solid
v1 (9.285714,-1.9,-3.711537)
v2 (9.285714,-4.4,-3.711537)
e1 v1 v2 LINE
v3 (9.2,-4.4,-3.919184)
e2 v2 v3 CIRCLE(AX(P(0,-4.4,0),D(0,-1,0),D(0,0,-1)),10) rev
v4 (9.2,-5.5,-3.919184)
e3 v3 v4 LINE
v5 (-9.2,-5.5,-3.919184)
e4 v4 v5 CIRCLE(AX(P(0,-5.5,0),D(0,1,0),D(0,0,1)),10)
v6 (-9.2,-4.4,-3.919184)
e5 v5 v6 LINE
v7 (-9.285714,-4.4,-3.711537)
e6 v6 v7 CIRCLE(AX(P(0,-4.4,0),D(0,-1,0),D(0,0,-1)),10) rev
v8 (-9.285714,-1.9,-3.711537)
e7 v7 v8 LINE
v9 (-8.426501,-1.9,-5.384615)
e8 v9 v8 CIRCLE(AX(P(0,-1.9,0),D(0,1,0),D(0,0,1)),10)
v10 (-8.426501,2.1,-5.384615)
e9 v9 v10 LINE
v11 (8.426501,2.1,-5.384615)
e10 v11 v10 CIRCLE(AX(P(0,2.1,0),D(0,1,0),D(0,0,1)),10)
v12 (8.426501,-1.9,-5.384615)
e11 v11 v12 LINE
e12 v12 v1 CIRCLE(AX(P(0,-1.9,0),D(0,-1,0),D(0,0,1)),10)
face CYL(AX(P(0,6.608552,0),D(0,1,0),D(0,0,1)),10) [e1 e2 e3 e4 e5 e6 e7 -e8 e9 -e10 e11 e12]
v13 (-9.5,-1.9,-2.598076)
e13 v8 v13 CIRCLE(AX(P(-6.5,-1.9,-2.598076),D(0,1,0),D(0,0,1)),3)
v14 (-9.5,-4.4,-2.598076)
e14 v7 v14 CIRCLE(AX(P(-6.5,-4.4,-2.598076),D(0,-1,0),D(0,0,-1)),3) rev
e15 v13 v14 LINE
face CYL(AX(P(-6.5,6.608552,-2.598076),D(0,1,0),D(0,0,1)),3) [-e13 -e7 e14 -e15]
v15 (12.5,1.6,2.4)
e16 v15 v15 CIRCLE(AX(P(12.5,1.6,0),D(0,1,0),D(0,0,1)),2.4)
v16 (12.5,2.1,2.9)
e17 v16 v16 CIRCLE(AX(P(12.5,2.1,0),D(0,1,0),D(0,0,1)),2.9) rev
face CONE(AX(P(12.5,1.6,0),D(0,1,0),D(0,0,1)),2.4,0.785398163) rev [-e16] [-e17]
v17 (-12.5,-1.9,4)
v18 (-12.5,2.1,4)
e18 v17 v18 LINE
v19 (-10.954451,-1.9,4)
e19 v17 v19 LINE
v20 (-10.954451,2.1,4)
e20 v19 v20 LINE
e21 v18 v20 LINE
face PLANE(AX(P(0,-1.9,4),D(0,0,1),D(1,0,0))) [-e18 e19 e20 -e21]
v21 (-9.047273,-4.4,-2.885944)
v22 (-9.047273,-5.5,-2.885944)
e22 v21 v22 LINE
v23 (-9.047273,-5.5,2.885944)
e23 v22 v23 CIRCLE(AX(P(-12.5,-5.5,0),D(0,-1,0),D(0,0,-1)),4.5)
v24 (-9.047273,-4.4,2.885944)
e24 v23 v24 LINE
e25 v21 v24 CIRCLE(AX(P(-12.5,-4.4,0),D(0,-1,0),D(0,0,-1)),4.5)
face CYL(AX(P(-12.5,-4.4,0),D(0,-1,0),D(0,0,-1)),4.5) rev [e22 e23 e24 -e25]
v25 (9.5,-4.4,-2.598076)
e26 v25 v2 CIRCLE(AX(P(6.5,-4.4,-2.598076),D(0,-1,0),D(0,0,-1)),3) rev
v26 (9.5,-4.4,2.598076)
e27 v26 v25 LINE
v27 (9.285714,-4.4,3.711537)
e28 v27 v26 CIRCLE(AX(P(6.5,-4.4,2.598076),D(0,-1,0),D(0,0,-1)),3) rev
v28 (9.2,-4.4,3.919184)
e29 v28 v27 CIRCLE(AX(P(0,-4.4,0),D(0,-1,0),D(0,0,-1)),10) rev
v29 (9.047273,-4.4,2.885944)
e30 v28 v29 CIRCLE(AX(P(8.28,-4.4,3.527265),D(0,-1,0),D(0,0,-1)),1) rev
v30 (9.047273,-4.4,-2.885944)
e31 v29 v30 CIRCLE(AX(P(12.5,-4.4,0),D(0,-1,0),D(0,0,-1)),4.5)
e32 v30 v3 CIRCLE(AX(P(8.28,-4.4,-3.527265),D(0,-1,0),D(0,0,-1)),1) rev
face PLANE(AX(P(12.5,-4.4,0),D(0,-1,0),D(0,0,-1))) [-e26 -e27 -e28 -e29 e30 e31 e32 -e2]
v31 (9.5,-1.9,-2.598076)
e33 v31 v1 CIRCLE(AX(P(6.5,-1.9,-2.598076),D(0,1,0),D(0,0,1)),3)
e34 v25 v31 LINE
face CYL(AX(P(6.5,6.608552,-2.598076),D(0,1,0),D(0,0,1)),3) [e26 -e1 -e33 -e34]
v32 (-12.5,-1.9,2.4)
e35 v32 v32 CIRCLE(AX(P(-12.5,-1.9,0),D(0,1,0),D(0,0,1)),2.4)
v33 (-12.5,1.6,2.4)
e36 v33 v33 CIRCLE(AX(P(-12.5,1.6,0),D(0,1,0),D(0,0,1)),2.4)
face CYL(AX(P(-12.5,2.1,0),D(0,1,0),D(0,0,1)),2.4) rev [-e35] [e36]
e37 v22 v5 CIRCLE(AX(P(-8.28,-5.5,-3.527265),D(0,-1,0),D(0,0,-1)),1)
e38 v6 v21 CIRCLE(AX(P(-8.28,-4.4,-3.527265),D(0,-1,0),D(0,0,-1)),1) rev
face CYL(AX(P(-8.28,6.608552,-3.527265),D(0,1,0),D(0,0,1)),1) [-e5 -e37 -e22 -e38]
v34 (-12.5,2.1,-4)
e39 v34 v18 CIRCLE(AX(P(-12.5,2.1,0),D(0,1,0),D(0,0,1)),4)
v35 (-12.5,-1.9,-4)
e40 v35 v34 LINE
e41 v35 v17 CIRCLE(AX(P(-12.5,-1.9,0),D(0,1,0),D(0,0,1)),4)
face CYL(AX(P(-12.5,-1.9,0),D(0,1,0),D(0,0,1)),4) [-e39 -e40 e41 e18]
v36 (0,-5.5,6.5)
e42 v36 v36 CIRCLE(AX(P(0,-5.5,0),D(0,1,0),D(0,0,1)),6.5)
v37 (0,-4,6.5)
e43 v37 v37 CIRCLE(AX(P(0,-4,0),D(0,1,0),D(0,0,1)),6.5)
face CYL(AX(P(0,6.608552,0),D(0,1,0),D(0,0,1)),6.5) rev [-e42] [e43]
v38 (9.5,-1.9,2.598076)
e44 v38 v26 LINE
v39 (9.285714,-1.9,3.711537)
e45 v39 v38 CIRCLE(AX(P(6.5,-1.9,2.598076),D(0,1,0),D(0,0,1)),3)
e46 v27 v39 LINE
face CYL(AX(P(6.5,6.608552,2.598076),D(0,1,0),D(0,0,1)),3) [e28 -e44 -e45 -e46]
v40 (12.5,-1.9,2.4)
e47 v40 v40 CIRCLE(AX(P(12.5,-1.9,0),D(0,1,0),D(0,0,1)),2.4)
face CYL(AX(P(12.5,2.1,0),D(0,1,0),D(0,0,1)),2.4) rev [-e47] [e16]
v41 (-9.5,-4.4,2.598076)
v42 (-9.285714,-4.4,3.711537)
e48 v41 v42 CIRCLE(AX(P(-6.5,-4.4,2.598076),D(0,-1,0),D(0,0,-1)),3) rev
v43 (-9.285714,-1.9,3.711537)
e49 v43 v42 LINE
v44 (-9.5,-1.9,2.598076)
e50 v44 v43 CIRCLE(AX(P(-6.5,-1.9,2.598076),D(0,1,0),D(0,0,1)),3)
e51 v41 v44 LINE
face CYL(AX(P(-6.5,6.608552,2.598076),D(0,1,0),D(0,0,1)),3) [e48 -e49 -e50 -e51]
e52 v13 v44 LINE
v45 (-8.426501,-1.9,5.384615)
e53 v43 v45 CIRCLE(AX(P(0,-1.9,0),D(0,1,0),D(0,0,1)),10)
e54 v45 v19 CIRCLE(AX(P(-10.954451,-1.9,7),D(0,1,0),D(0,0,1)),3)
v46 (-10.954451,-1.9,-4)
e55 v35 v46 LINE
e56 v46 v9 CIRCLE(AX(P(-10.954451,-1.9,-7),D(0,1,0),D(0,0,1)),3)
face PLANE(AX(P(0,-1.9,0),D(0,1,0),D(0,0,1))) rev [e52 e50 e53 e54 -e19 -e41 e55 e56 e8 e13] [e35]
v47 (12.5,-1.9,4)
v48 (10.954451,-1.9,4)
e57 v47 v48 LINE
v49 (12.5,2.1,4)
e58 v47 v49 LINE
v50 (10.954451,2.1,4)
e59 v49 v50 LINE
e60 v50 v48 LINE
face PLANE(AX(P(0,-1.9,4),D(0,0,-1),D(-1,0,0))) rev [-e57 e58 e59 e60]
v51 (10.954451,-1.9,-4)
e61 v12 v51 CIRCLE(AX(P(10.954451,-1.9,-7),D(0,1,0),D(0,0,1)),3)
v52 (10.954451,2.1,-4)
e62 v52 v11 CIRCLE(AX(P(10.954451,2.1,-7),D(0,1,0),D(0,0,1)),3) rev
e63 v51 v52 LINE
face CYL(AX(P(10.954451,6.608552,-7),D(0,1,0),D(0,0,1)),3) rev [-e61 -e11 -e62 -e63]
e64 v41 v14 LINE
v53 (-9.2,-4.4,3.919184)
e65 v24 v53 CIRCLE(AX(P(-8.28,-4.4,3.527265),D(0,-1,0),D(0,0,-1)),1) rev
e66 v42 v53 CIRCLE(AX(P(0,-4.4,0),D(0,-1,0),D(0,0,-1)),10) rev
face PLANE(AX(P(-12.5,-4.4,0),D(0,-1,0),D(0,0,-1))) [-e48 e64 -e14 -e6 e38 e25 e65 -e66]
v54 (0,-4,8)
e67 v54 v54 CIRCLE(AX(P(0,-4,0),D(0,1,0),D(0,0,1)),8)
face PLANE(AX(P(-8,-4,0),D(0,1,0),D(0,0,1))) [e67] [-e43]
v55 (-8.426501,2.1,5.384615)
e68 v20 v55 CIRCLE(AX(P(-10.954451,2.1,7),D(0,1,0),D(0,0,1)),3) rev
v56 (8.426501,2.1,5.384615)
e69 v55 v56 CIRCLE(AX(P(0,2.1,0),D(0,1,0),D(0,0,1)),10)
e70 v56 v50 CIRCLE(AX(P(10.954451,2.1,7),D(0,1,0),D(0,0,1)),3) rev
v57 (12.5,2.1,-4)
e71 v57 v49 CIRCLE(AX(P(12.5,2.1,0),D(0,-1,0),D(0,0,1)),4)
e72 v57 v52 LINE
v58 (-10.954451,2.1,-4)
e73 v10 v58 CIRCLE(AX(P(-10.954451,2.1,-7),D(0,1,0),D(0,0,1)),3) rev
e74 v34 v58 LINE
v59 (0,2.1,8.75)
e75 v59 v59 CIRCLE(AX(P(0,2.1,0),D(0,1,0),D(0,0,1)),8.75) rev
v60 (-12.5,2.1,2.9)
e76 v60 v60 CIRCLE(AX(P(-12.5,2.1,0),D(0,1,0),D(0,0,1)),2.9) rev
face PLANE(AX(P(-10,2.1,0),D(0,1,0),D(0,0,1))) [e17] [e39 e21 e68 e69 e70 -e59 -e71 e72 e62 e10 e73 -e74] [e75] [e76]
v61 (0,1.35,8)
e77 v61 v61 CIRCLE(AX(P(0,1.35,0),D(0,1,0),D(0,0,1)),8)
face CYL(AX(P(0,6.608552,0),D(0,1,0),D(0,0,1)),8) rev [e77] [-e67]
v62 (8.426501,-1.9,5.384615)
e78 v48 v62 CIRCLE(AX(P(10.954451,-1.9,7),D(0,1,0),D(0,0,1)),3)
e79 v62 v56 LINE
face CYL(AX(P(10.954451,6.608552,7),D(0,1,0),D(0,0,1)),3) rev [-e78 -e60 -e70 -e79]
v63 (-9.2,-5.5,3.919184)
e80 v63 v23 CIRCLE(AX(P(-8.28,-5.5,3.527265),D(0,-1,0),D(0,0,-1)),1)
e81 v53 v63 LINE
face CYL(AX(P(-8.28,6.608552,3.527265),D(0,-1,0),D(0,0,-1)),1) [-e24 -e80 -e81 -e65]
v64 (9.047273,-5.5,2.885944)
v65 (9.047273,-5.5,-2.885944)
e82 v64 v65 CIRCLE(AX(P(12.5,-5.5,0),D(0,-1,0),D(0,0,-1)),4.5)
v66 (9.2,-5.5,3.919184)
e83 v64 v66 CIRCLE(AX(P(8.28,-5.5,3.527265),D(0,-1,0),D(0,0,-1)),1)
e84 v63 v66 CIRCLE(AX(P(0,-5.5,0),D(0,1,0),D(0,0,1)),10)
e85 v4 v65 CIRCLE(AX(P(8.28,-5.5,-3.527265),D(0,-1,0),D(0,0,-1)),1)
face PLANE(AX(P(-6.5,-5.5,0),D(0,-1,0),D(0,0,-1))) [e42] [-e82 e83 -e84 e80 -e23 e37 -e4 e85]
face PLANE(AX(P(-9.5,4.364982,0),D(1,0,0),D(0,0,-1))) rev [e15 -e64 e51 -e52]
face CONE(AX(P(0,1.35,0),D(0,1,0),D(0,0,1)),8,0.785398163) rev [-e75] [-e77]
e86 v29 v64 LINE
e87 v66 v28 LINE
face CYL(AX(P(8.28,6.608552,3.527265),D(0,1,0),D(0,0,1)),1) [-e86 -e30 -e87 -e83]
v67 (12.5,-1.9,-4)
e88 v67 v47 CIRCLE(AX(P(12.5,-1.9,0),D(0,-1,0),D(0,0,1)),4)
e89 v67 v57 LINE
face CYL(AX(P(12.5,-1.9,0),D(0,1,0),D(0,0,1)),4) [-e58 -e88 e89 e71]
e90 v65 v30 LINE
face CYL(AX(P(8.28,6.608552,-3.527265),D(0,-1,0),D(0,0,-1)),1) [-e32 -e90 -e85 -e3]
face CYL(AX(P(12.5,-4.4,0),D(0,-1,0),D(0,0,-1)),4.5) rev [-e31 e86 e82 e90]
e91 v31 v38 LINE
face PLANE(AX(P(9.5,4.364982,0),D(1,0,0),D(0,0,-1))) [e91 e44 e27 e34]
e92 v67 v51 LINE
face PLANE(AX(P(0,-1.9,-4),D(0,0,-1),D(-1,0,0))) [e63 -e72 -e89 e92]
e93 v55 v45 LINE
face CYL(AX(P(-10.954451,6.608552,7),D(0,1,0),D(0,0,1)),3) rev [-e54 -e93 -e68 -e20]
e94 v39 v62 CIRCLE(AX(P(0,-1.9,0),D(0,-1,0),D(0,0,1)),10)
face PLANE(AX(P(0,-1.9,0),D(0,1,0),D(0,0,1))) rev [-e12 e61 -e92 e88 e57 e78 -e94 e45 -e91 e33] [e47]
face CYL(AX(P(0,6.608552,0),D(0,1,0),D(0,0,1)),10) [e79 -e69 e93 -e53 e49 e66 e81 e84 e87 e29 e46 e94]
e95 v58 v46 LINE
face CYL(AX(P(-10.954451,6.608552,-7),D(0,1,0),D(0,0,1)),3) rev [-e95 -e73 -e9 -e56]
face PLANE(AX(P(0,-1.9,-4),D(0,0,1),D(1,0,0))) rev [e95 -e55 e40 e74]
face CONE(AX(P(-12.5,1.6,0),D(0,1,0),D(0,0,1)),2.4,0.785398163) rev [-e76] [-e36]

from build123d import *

# Parameters (mm, degrees)
BOSS_EXTRU_1_DEPTH             = 4
ENL_V_START                    = -4
ENL_V_MAT_EXTRU_3_DEPTH        = 3.6
CONG_2_R                       = 3
CONG_3_R                       = 3
CONG_2_OF_SYM_TRIE1_R          = 3
CONG_3_OF_SYM_TRIE1_R          = 3
F_4_8_4_8_DIAMETER_HOLE2_D     = 4.8
F_4_8_4_8_DIAMETER_HOLE2_DEPTH = 6.4
F_4_8_4_8_DIAMETER_HOLE2_TIP   = 1.442065486
CHANFREIN1_SIZE                = 0.5
ESQUISSE9_R                    = 4.5
ENL_V_MAT_EXTRU_4_DEPTH        = 1.1
CONG_4_R                       = 1
CHANFREIN2_SIZE                = 0.75


with BuildPart() as part:
    # Esquisse1 → Révolution1 (revolve)
    with BuildSketch(Plane.XY, mode=Mode.PRIVATE) as r_volution1_sk:
        Polygon((-6.5, -4), (-6.5, -5.5), (-10, -5.5), (-10, 2.1), (-8, 2.1), (-8, -4), align=None)
    revolve(r_volution1_sk.sketch.rotate(Axis((0, 6.608552154, 0), (0, -1, 0)), 270), axis=Axis((0, 6.608552154, 0), (0, -1, 0)))

    # Esquisse2 → Boss.-Extru.1 (add)
    with BuildSketch(Plane(origin=(0, 2.1, 0), x_dir=(1, 0, 0), z_dir=(0, 1, 0))):
        with BuildLine():
            Line((-12.5, -4), (-9.16515139, -4))
            ThreePointArc((-9.16515139, -4), (-10, 0), (-9.16515139, 4))
            Line((-9.16515139, 4), (-12.5, 4))
            ThreePointArc((-12.5, 4), (-16.5, 0), (-12.5, -4))
        make_face()
    boss_extru_1 = extrude(amount=-BOSS_EXTRU_1_DEPTH)

    # Esquisse2<6> → Enlèv. mat.-Extru.3 (cut)
    with BuildSketch(Plane(origin=(0, 2.1, 0), x_dir=(1, 0, 0), z_dir=(0, 1, 0)).offset(ENL_V_START)):
        with BuildLine():
            ThreePointArc((-9.5, 3.122498999), (-10, 0), (-9.5, -3.122498999))
            Line((-9.5, -3.122498999), (-9.5, 3.122498999))
        make_face()
    enl_v_mat_extru_3 = extrude(amount=-ENL_V_MAT_EXTRU_3_DEPTH, mode=Mode.SUBTRACT)

    # Congé2
    cong_2_edges = [part.edges().sort_by_distance(p)[0] for p in [
        (-9.5, -3.7, 3.122498999),
        (-9.5, -3.7, -3.122498999),
    ]]
    fillet(cong_2_edges, radius=CONG_2_R)

    # Congé3
    cong_3_edges = [part.edges().sort_by_distance(p)[0] for p in [
        (-9.16515139, 0.1, -4),
        (-9.16515139, 0.1, 4),
    ]]
    fillet(cong_3_edges, radius=CONG_3_R)

    # Symétrie1: Boss.-Extru.1, Enlèv. mat.-Extru.3 across plane
    add(boss_extru_1.mirror(Plane(origin=(0, 0, 0), x_dir=(0, 0, 1), z_dir=(1, 0, 0))))
    add(enl_v_mat_extru_3.mirror(Plane(origin=(0, 0, 0), x_dir=(0, 0, 1), z_dir=(1, 0, 0))), mode=Mode.SUBTRACT)

    # Congé2 of Symétrie1
    cong_2_of_sym_trie1_edges = [part.edges().sort_by_distance(p)[0] for p in [
        (9.5, -3.7, 3.122498999),
        (9.5, -3.7, -3.122498999),
    ]]
    fillet(cong_2_of_sym_trie1_edges, radius=CONG_2_OF_SYM_TRIE1_R)

    # Congé3 of Symétrie1
    cong_3_of_sym_trie1_edges = [part.edges().sort_by_distance(p)[0] for p in [
        (9.16515139, 0.1, -4),
        (9.16515139, 0.1, 4),
    ]]
    fillet(cong_3_of_sym_trie1_edges, radius=CONG_3_OF_SYM_TRIE1_R)

    # Ø4.8 (4.8) Diameter Hole2
    with Locations(Plane(origin=(0, 2.1, 0), x_dir=(1, 0, 0), z_dir=(0, 1, 0))):
        with Locations((-12.5, 0), (12.5, 0)):
            Hole(F_4_8_4_8_DIAMETER_HOLE2_D / 2, depth=F_4_8_4_8_DIAMETER_HOLE2_DEPTH)
            with Locations((0, 0, -(F_4_8_4_8_DIAMETER_HOLE2_DEPTH + F_4_8_4_8_DIAMETER_HOLE2_TIP / 2))):  # 118° drill point
                Cone(0, F_4_8_4_8_DIAMETER_HOLE2_D / 2, F_4_8_4_8_DIAMETER_HOLE2_TIP, mode=Mode.SUBTRACT)

    # Chanfrein1
    chanfrein1_edges = [part.edges().sort_by_distance(p)[0] for p in [
        (14.9, 2.1, 0),
        (-10.1, 2.1, 0),
    ]]
    chamfer(chanfrein1_edges, length=CHANFREIN1_SIZE)

    # Esquisse9 → Enlèv. mat.-Extru.4 (cut)
    with BuildSketch(Plane.XZ.offset(5.5)):
        with Locations((-12.5, 0)):
            Circle(ESQUISSE9_R)
        with Locations((12.5, 0)):
            Circle(ESQUISSE9_R)
    extrude(amount=-ENL_V_MAT_EXTRU_4_DEPTH, mode=Mode.SUBTRACT)

    # Congé4
    # the kernel refuses this fillet: 1 mm, written as the material it takes off along each edge
    with BuildSketch(Plane(origin=(9.421052632, -4.4, 3.281780477), x_dir=(-0.686560042836171, 0, -0.7270731102033653), z_dir=(0, -1, 0))) as cong_4_piece_1:
        with BuildLine():
            CenterArc((0.604915781, -0.998168708), CONG_4_R, 93.468029374, 62.964308211)
            Line((-0.311672758, -0.598336932), (-0.403331612, -0.558353754))
            ThreePointArc((-0.403331612, -0.558353754), (-0.310284429, -0.351422835), (-0.083419367, 0.05514716))
            Line((-0.083419367, 0.05514716), (0.006049158, 0.099816871))
            ThreePointArc((0.006049158, 0.099816871), (0.272212102, 0.091759185), (0.538375045, 0.099816871))
            Line((0.538375045, 0.099816871), (0.544424203, 0))
        make_face()
    extrude(amount=2.786614567, mode=Mode.SUBTRACT)
    with BuildSketch(Plane(origin=(9.421052632, -4.4, -3.281780477), x_dir=(-0.6865600428361709, 0, 0.7270731102033654), z_dir=(0, -1, 0)), Plane(origin=(-9.421052632, -4.4, 3.281780477), x_dir=(0.6865600428361707, 0, -0.7270731102033658), z_dir=(0, -1, 0))) as cong_4_piece_2:
        with BuildLine():
            CenterArc((0.604915781, 0.998168708), CONG_4_R, 203.567662416, 62.964308211)
            Line((-0.311672758, 0.598336932), (-0.403331612, 0.558353754))
            ThreePointArc((-0.403331612, 0.558353754), (-0.310284429, 0.351422835), (-0.083419367, -0.05514716))
            Line((-0.083419367, -0.05514716), (0.006049158, -0.099816871))
            ThreePointArc((0.006049158, -0.099816871), (0.272212102, -0.091759185), (0.538375045, -0.099816871))
            Line((0.538375045, -0.099816871), (0.544424203, 0))
        make_face()
    extrude(amount=2.786614567, mode=Mode.SUBTRACT)
    with BuildSketch(Plane(origin=(-9.421052632, -4.4, -3.281780477), x_dir=(0.3276573021844398, 0, -0.9447966407249841), z_dir=(0, -1, 0))) as cong_4_piece_3:
        with BuildLine():
            CenterArc((0.605807396, 0.997627822), CONG_4_R, 210.982965052, 62.964308211)
            Line((-0.251512996, 0.482844619), (-0.337245035, 0.431366299))
            ThreePointArc((-0.337245035, 0.431366299), (-0.207136841, 0.199031418), (-0.091321217, -0.04074844))
            Line((-0.091321217, -0.04074844), (-0.010371424, -0.099460714))
            ThreePointArc((-0.010371424, -0.099460714), (0.455018696, -0.112838034), (0.68152967, -0.099762782))
            Line((0.68152967, -0.099762782), (0.674645827, 0))
        make_face()
    extrude(amount=2.786614567, mode=Mode.SUBTRACT)

    # Chanfrein2
    chanfrein2_edges = [part.edges().sort_by_distance(p)[0] for p in [
        (0, 2.1, -8),
    ]]
    chamfer(chanfrein2_edges, length=CHANFREIN2_SIZE)


solid = part.part
